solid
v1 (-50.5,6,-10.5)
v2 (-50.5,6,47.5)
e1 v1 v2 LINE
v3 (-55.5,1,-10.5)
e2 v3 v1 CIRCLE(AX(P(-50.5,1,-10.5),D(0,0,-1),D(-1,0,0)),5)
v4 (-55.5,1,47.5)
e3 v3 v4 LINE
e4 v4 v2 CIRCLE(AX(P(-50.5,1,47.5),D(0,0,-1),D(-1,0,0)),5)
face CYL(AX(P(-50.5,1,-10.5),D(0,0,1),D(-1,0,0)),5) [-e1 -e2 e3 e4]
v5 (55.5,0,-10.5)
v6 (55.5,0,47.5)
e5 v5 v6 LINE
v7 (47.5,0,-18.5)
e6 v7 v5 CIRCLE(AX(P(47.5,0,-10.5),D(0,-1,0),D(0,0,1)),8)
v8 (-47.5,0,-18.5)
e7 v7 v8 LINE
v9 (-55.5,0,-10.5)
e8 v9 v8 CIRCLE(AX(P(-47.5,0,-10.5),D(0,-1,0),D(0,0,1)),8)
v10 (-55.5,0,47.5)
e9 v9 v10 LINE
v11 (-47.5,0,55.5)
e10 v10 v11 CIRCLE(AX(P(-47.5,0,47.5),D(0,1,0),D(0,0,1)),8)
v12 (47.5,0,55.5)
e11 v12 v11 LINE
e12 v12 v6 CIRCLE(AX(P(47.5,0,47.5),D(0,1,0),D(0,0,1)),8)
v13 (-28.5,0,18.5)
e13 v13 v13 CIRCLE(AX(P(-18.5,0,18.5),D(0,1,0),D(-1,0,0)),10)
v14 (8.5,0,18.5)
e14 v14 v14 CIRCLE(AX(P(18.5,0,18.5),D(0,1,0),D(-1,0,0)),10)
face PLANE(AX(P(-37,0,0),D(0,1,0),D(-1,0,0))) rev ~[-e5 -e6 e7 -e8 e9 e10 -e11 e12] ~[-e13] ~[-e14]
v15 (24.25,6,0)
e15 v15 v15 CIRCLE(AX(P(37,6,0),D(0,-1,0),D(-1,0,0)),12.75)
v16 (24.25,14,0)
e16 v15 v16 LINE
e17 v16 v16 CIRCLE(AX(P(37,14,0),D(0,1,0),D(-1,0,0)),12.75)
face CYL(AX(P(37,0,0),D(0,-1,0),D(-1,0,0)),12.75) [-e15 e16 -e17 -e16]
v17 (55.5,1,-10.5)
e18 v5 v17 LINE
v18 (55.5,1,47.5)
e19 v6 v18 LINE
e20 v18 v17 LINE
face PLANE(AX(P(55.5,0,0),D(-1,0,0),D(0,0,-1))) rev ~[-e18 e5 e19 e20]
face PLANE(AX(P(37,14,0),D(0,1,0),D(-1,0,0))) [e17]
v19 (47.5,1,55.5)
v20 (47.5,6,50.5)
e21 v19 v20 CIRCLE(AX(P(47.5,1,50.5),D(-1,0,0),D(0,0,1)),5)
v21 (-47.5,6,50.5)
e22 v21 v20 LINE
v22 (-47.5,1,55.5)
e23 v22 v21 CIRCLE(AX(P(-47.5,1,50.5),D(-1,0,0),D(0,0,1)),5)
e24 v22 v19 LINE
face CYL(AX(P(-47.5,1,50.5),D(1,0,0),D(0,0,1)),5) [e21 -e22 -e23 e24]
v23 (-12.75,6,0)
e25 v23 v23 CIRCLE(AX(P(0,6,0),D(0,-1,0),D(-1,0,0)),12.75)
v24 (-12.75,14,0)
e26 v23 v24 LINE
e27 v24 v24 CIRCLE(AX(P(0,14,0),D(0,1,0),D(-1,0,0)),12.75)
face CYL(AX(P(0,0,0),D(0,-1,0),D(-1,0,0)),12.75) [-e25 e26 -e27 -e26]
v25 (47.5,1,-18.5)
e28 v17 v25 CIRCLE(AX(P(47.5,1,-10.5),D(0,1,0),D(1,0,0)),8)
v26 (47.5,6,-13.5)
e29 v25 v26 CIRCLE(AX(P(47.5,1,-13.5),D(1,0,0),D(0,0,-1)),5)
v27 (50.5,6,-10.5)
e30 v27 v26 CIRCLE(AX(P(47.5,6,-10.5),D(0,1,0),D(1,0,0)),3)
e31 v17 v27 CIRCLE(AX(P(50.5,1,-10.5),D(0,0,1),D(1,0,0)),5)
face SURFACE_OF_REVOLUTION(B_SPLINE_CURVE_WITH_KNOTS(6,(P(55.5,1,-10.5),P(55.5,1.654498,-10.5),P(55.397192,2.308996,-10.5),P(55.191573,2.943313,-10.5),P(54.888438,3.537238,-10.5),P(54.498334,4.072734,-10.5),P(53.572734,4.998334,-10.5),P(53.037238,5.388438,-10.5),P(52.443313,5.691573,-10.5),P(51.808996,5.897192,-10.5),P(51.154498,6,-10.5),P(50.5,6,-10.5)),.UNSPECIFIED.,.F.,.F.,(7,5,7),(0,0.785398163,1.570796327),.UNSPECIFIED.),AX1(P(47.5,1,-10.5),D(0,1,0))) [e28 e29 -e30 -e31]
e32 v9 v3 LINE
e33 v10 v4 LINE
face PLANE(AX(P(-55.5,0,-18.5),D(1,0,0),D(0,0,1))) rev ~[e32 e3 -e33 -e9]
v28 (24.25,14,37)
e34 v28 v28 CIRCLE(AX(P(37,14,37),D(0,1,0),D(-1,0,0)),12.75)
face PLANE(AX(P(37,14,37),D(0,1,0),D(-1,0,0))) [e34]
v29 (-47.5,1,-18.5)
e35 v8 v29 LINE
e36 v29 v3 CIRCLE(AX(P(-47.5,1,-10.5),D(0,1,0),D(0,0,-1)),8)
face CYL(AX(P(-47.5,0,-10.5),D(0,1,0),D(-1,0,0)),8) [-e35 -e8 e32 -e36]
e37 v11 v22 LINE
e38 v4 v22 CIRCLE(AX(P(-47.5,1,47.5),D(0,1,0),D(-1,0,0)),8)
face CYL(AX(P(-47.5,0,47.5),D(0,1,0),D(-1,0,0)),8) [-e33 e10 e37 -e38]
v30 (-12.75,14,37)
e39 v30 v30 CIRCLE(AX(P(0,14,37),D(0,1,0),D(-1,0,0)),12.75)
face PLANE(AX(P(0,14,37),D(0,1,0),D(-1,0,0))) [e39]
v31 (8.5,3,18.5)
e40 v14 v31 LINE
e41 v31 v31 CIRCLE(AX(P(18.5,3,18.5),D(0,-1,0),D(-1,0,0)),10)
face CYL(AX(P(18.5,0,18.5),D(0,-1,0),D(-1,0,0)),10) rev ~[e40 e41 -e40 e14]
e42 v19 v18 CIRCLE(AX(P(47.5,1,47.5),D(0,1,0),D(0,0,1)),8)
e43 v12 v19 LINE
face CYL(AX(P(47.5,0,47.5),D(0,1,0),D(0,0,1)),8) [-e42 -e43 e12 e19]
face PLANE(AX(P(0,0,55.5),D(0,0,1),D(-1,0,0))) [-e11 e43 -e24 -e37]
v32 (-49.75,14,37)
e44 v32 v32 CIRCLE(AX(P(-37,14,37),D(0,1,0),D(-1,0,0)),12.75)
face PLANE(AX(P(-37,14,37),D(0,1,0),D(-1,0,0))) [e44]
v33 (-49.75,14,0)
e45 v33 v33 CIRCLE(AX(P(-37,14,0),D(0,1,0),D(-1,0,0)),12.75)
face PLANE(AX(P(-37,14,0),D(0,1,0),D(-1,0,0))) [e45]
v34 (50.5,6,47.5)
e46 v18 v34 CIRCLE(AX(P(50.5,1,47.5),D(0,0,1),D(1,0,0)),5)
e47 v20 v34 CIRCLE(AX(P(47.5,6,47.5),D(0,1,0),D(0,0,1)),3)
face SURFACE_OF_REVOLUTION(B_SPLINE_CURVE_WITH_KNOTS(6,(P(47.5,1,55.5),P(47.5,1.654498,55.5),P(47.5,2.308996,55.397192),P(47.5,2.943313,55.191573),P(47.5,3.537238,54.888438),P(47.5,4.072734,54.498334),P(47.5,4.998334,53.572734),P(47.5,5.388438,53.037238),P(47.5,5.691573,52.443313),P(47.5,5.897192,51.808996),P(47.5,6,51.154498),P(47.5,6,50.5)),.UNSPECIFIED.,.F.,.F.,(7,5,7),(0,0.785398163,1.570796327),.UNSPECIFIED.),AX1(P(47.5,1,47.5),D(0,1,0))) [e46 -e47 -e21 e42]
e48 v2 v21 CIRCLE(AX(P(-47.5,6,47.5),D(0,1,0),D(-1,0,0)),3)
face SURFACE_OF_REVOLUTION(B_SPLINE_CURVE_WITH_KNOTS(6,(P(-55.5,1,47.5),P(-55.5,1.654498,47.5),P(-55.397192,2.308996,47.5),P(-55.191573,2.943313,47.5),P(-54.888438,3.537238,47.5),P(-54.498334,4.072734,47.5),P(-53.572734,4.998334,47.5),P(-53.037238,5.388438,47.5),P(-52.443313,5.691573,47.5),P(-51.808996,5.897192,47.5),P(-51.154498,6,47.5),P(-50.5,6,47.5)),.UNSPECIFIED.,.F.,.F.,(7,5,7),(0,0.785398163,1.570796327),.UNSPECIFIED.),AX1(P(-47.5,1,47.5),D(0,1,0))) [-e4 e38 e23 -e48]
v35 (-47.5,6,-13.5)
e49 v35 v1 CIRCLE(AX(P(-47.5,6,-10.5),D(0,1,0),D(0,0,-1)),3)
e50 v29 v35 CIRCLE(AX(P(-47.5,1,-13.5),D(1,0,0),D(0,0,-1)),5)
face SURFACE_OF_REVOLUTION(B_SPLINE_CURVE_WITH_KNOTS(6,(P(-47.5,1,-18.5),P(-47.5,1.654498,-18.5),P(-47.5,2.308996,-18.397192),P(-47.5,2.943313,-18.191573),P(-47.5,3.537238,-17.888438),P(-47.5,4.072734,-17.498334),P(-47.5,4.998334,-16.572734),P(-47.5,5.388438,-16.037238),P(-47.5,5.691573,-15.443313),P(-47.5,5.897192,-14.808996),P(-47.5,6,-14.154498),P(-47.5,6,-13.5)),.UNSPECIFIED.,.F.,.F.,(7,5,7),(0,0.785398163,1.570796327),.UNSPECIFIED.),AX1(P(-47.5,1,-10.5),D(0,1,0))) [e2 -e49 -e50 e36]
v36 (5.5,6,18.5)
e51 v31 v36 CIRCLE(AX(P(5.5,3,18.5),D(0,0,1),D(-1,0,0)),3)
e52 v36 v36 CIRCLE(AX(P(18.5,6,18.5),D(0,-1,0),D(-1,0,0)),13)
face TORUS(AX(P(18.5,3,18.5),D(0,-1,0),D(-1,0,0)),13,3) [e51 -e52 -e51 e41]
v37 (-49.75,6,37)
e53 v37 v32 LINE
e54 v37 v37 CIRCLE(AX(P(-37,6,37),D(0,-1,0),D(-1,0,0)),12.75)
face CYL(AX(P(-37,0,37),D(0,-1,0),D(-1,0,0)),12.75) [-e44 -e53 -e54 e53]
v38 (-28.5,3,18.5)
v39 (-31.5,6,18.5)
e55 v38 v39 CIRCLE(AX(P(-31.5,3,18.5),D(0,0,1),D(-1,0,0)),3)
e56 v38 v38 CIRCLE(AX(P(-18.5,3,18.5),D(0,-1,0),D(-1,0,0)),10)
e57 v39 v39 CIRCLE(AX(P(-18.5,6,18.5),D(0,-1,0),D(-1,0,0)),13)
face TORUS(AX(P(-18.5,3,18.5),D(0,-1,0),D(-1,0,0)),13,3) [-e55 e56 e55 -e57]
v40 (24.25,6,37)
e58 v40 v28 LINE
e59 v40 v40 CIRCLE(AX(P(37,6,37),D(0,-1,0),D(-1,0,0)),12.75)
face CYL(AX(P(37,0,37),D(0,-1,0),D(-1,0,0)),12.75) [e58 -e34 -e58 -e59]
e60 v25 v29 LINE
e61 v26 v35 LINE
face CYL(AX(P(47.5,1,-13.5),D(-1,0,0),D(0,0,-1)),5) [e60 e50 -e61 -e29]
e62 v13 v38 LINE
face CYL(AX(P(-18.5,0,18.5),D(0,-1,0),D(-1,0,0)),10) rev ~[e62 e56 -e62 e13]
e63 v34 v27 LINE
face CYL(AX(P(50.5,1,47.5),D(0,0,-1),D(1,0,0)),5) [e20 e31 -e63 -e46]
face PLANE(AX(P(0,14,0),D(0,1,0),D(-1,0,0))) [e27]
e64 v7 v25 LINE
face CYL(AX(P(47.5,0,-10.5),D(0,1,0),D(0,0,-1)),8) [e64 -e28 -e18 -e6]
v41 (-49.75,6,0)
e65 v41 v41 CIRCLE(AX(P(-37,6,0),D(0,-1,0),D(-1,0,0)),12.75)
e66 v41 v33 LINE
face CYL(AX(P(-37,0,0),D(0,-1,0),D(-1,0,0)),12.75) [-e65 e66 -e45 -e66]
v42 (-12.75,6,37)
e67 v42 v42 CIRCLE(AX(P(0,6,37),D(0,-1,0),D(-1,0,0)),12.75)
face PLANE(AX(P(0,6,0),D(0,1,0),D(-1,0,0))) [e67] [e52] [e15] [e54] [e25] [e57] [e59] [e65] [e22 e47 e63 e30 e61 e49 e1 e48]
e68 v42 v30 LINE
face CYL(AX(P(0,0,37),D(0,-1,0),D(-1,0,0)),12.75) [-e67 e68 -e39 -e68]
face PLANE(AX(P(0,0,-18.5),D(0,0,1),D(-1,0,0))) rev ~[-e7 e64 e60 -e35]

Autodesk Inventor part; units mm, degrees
ref_plane "YZ Plane" through (0, 0, 0) normal (1, 0, 0) x (0, 1, 0)
ref_plane "XZ Plane" through (0, 0, 0) normal (0, 1, 0) x (-1, 0, 0)
ref_plane "XY Plane" through (0, 0, 0) normal (0, 0, 1) x (1, 0, 0)
sketch "Sketch1" plane through (0, 0, 0) normal (0, 1, 0) x (-1, 0, 0)
  line L0 (25.9, 0) -> (-25.9, 0) projected
  line L1 (0, -25.9) -> (0, 25.9) projected
  circle A0 centre (0, 0) radius 18.5 construction
  circle A1 centre (0, 0) radius 13 construction
  dimension "d0" = 37
  dimension "d1" = 26
sketch "Sketch2" plane through (0, 0, 0) normal (0, 1, 0) x (-1, 0, 0)
  line L0 (77.7, 0) -> (-77.7, 0) projected
  line L1 (0, -33.3) -> (0, 70.3) projected
  line L2 (-55.5, 55.5) -> (-55.5, -18.5)
  line L3 (-55.5, -18.5) -> (55.5, -18.5)
  line L4 (55.5, -18.5) -> (55.5, 55.5)
  line L5 (-55.5, 55.5) -> (55.5, 55.5)
  circle A0 centre (0, 37) radius 18.5 construction
  point P0 (0, 0)
  dimension "d3" = 111
  dimension "d29" = 18.5
  dimension "d30" = 55.5
  dimension "d99" = 37
  dimension "d100" = 37
extrude "Extrusion1" add sketch "Sketch2" along normal blind 6
sketch "Sketch6" plane through (0, 0, 0) normal (0, 1, 0) x (-1, 0, 0)
  line L0 (55.5, -18.5) -> (-55.5, -18.5) projected
  line L1 (55.5, 55.5) -> (55.5, -18.5) projected
  line L2 (-55.5, -18.5) -> (55.5, -18.5)
  line L3 (55.5, -18.5) -> (55.5, 55.5)
  line L4 (-55.5, 55.5) -> (-55.5, -18.5)
  line L5 (84.7, 0) -> (-84.7, 0) projected
  line L6 (0, -36.3) -> (0, 70.8) projected
  arc A0 (-16, 0) -> (16, 0) centre (0, 0) ccw
  line L7 (16, 0) -> (16, 55.5)
  line L8 (55.5, 55.5) -> (-55.5, 55.5) projected
  line L9 (16, 55.5) -> (55.5, 55.5)
  line L10 (-16, 0) -> (-16, 55.5)
  line L11 (-16, 55.5) -> (-55.5, 55.5)
  point P0 (-17.3617, -21)
  dimension "d18" = 32
extrude "Extrusion5" [suppressed]
sketch "Sketch4" plane through (0, 0, 0) normal (0, 0, 1) x (1, 0, 0)
  line L0 (-18.5, 0) -> (18.5, 0)
  line L1 (18.5, 0) -> (18.5, -2)
  line L2 (18.5, -2) -> (-18.5, -2)
  line L3 (-18.5, -2) -> (-18.5, 0)
  line L4 (-25.9, 0) -> (25.9, 0) projected
  line L5 (0, -2.4) -> (0, 0.4) projected
  point P0 (0, 0)
  dimension "d10" = 37
  dimension "d11" = 2
extrude "Extrusion6" [suppressed]
sketch "Sketch5" plane through (0, 0, 0) normal (0, 1, 0) x (-1, 0, 0)
  circle A0 centre (0, 0) radius 18.5 construction
  circle A1 centre (0, 0) radius 18.5 construction
  line L0 (25.9, 0) -> (-25.9, 0) projected
  line L1 (0, -28.9) -> (0, 26.4) projected
  line L2 (-18.5, -21) -> (18.5, -21)
  line L3 (18.5, -21) -> (18.5, -18.5)
  line L4 (18.5, -18.5) -> (-18.5, -18.5)
  line L5 (-18.5, -18.5) -> (-18.5, -21)
  dimension "d25" = 37
  dimension "d26" = 21
extrude "Extrusion7" [suppressed]
sketch "Sketch7" plane through (0, 0, 0) normal (0, 0, 1) x (1, 0, 0)
  line L0 (-18.5, 0) -> (18.5, 0)
  line L1 (18.5, 0) -> (18.5, -2)
  line L2 (18.5, -2) -> (-18.5, -2)
  line L3 (-18.5, -2) -> (-18.5, 0)
  line L4 (55.5, 0) -> (-55.5, 0) projected
  line L5 (-84.7, 0) -> (84.7, 0) projected
  line L6 (0, -2.4) -> (0, 0.4) projected
  point P0 (-16, 0)
  point P1 (16, 0)
  dimension "d53" = 2
  dimension "d54" = 18.5
extrude "Extrusion8" [suppressed]
sketch "Sketch8" plane through (0, 0, 0) normal (0, 1, 0) x (-1, 0, 0)
  circle A0 centre (0, 0) radius 12.75
  dimension "d34" = 25.5
extrude "Extrusion9" add sketch "Sketch8" along normal blind 14
pattern_linear "Rectangular Pattern1" count 2 spacing 37 along (0, 0, 1) count 3 spacing 37 along (1, 0, 0) of "Extrusion9" second direction both ways yes
sketch "Sketch9" plane through (0, 6, 0) normal (0, 1, 0) x (1, 0, 0)
  circle A0 centre (0, 0) radius 13
  circle A1 centre (0, 0) radius 15
  dimension "d40" = 26
  dimension "d41" = 30
extrude "Extrusion10" [suppressed]
sketch "Sketch10" plane through (0, 5, 0) normal (0, 1, 0) x (1, 0, 0)
  arc A0 (16, 0) -> (-16, 0) centre (0, 0) ccw projected
  line L0 (1.5, -18) -> (-1.5, -18)
  line L1 (-29.4, 0) -> (29.4, 0) projected
  line L2 (0, 36.3) -> (0, -70.8) projected
  line L3 (1.5, -12) -> (-1.5, -12)
  line L4 (1.5, -12) -> (1.5, -18)
  line L5 (-1.5, -18) -> (-1.5, -12)
  dimension "d48" = 3
  dimension "d49" = 12
  dimension "d50" = 6
extrude "Extrusion11" [suppressed]
fillet "Fillet1" [suppressed]
sketch "Sketch11" plane through (0, 0, 0) normal (0, 1, 0) x (-1, 0, 0)
  line L0 (-60.5, -21) -> (60.5, -21)
  line L1 (60.5, -21) -> (60.5, -47)
  line L2 (60.5, -47) -> (-60.5, -47)
  line L3 (-60.5, -47) -> (-60.5, -21)
  line L4 (84.7, 0) -> (-84.7, 0) projected
  line L5 (0, -60.1) -> (0, 31.6) projected
  point P0 (0, 0)
  dimension "d57" = 26
  dimension "d58" = 21
  dimension "d59" = 121
extrude "Extrusion12" [suppressed]
sketch "Sketch12" plane through (0, 0, 0) normal (1, 0, 0) x (0, 1, 0)
  line L0 (6, 55.5) -> (6, -18.5) projected
  arc A0 (6, -16.5081) -> (5.7334, -47) centre (34, -32) ccw
  line L1 (-6.8, 0) -> (40.8, 0) projected
  line L2 (0, -67.5) -> (0, 76) projected
  line L3 (6, -16.5081) -> (6, -47)
  line L4 (6, -47) -> (5.7334, -47)
  line L5 (0, -47) -> (6, -47) projected
  point P0 (0, 0)
  point P1 (6, 48)
  dimension "d62" = 32
  dimension "d63" = 32
  dimension "d64" = 34
extrude "Extrusion13" [suppressed]
fillet "Fillet3" [suppressed]
sketch "Sketch13" plane through (0, 0, 0) normal (0, 1, 0) x (-1, 0, 0)
  line L0 (84.7, 0) -> (-84.7, 0) projected
  line L1 (0, -67.5) -> (0, 76) projected
  line L2 (55.5, 55.5) -> (55.5, -18.5) projected
  arc A0 (13.0815, 23.9185) -> (13.0815, 13.0815) centre (18.5, 18.5) ccw
  line L3 (-55.5, 55.5) -> (-55.5, -18.5) projected
  arc A1 (-13.0815, 13.0815) -> (-13.0815, 23.9185) centre (-18.5, 18.5) ccw
  line L4 (18.5, 37) -> (18.5, 0)
  line L5 (-18.5, 0) -> (-18.5, 37)
  line L6 (18.5, 37) -> (18.5, 55.5)
  line L7 (-55.5, 55.5) -> (55.5, 55.5) projected
  line L8 (-18.5, 55.5) -> (-18.5, 37)
  arc A2 (-9.2871, 53) -> (-13.0815, 23.9185) centre (0, 37) ccw
  arc A3 (13.0815, 23.9185) -> (9.2871, 53) centre (0, 37) ccw
  arc A4 (-13.0815, 13.0815) -> (-18.5, 0) centre (0, 0) ccw
  arc A5 (18.5, 0) -> (13.0815, 13.0815) centre (0, 0) ccw
  point P0 (60.5, -39.254)
  point P1 (-55.5, 48)
  point P2 (-60.5, -16.5081)
  point P3 (-60.5, -47)
  point P4 (55.5, -18.5)
  point P5 (-55.5, -18.5)
  dimension "d68" = 37
  dimension "d71" = 18.5
  dimension "d72" = 18.5
  dimension "d73" = 7.663
  dimension "d74" = 7.663
  dimension "d75" = 18.5
  dimension "d76" = 18.5
  dimension "d77" = 18.5
  dimension "d78" = 18.5
extrude "Extrusion14" [suppressed]
sketch "Sketch14" plane through (0, 0, 0) normal (0, 1, 0) x (-1, 0, 0)
  circle A0 centre (18.5, 18.5) radius 10
  line L0 (39.9, 0) -> (-39.9, 0) projected
  line L1 (0, -27.9) -> (0, 37.9) projected
  circle A1 centre (-18.5, 18.5) radius 10
  point P0 (0, 0)
  dimension "d84" = 18.5
  dimension "d85" = 18.5
  dimension "d86" = 20
  dimension "d89" = 37
extrude "Extrusion15" cut sketch "Sketch14" along normal through all
fillet "Fillet4" radius 3 2 edges at (-8.5, 6, 18.5) (28.5, 6, 18.5)
fillet "Fillet5" radius 8 4 edges at (-55.5, 3, 55.5) (55.5, 3, 55.5) (-55.5, 3, -18.5) (55.5, 3, -18.5)
fillet "Fillet6" radius 5 5 edges at (53.1569, 6, 53.1569) (55.5, 6, 18.5) (-53.1569, 6, 53.1569) (-55.5, 6, 18.5) (0, 6, 55.5)
equation "\"d85\" = d84"
properties part number "NespressoSpeedfiller-6X-long-tamper"
